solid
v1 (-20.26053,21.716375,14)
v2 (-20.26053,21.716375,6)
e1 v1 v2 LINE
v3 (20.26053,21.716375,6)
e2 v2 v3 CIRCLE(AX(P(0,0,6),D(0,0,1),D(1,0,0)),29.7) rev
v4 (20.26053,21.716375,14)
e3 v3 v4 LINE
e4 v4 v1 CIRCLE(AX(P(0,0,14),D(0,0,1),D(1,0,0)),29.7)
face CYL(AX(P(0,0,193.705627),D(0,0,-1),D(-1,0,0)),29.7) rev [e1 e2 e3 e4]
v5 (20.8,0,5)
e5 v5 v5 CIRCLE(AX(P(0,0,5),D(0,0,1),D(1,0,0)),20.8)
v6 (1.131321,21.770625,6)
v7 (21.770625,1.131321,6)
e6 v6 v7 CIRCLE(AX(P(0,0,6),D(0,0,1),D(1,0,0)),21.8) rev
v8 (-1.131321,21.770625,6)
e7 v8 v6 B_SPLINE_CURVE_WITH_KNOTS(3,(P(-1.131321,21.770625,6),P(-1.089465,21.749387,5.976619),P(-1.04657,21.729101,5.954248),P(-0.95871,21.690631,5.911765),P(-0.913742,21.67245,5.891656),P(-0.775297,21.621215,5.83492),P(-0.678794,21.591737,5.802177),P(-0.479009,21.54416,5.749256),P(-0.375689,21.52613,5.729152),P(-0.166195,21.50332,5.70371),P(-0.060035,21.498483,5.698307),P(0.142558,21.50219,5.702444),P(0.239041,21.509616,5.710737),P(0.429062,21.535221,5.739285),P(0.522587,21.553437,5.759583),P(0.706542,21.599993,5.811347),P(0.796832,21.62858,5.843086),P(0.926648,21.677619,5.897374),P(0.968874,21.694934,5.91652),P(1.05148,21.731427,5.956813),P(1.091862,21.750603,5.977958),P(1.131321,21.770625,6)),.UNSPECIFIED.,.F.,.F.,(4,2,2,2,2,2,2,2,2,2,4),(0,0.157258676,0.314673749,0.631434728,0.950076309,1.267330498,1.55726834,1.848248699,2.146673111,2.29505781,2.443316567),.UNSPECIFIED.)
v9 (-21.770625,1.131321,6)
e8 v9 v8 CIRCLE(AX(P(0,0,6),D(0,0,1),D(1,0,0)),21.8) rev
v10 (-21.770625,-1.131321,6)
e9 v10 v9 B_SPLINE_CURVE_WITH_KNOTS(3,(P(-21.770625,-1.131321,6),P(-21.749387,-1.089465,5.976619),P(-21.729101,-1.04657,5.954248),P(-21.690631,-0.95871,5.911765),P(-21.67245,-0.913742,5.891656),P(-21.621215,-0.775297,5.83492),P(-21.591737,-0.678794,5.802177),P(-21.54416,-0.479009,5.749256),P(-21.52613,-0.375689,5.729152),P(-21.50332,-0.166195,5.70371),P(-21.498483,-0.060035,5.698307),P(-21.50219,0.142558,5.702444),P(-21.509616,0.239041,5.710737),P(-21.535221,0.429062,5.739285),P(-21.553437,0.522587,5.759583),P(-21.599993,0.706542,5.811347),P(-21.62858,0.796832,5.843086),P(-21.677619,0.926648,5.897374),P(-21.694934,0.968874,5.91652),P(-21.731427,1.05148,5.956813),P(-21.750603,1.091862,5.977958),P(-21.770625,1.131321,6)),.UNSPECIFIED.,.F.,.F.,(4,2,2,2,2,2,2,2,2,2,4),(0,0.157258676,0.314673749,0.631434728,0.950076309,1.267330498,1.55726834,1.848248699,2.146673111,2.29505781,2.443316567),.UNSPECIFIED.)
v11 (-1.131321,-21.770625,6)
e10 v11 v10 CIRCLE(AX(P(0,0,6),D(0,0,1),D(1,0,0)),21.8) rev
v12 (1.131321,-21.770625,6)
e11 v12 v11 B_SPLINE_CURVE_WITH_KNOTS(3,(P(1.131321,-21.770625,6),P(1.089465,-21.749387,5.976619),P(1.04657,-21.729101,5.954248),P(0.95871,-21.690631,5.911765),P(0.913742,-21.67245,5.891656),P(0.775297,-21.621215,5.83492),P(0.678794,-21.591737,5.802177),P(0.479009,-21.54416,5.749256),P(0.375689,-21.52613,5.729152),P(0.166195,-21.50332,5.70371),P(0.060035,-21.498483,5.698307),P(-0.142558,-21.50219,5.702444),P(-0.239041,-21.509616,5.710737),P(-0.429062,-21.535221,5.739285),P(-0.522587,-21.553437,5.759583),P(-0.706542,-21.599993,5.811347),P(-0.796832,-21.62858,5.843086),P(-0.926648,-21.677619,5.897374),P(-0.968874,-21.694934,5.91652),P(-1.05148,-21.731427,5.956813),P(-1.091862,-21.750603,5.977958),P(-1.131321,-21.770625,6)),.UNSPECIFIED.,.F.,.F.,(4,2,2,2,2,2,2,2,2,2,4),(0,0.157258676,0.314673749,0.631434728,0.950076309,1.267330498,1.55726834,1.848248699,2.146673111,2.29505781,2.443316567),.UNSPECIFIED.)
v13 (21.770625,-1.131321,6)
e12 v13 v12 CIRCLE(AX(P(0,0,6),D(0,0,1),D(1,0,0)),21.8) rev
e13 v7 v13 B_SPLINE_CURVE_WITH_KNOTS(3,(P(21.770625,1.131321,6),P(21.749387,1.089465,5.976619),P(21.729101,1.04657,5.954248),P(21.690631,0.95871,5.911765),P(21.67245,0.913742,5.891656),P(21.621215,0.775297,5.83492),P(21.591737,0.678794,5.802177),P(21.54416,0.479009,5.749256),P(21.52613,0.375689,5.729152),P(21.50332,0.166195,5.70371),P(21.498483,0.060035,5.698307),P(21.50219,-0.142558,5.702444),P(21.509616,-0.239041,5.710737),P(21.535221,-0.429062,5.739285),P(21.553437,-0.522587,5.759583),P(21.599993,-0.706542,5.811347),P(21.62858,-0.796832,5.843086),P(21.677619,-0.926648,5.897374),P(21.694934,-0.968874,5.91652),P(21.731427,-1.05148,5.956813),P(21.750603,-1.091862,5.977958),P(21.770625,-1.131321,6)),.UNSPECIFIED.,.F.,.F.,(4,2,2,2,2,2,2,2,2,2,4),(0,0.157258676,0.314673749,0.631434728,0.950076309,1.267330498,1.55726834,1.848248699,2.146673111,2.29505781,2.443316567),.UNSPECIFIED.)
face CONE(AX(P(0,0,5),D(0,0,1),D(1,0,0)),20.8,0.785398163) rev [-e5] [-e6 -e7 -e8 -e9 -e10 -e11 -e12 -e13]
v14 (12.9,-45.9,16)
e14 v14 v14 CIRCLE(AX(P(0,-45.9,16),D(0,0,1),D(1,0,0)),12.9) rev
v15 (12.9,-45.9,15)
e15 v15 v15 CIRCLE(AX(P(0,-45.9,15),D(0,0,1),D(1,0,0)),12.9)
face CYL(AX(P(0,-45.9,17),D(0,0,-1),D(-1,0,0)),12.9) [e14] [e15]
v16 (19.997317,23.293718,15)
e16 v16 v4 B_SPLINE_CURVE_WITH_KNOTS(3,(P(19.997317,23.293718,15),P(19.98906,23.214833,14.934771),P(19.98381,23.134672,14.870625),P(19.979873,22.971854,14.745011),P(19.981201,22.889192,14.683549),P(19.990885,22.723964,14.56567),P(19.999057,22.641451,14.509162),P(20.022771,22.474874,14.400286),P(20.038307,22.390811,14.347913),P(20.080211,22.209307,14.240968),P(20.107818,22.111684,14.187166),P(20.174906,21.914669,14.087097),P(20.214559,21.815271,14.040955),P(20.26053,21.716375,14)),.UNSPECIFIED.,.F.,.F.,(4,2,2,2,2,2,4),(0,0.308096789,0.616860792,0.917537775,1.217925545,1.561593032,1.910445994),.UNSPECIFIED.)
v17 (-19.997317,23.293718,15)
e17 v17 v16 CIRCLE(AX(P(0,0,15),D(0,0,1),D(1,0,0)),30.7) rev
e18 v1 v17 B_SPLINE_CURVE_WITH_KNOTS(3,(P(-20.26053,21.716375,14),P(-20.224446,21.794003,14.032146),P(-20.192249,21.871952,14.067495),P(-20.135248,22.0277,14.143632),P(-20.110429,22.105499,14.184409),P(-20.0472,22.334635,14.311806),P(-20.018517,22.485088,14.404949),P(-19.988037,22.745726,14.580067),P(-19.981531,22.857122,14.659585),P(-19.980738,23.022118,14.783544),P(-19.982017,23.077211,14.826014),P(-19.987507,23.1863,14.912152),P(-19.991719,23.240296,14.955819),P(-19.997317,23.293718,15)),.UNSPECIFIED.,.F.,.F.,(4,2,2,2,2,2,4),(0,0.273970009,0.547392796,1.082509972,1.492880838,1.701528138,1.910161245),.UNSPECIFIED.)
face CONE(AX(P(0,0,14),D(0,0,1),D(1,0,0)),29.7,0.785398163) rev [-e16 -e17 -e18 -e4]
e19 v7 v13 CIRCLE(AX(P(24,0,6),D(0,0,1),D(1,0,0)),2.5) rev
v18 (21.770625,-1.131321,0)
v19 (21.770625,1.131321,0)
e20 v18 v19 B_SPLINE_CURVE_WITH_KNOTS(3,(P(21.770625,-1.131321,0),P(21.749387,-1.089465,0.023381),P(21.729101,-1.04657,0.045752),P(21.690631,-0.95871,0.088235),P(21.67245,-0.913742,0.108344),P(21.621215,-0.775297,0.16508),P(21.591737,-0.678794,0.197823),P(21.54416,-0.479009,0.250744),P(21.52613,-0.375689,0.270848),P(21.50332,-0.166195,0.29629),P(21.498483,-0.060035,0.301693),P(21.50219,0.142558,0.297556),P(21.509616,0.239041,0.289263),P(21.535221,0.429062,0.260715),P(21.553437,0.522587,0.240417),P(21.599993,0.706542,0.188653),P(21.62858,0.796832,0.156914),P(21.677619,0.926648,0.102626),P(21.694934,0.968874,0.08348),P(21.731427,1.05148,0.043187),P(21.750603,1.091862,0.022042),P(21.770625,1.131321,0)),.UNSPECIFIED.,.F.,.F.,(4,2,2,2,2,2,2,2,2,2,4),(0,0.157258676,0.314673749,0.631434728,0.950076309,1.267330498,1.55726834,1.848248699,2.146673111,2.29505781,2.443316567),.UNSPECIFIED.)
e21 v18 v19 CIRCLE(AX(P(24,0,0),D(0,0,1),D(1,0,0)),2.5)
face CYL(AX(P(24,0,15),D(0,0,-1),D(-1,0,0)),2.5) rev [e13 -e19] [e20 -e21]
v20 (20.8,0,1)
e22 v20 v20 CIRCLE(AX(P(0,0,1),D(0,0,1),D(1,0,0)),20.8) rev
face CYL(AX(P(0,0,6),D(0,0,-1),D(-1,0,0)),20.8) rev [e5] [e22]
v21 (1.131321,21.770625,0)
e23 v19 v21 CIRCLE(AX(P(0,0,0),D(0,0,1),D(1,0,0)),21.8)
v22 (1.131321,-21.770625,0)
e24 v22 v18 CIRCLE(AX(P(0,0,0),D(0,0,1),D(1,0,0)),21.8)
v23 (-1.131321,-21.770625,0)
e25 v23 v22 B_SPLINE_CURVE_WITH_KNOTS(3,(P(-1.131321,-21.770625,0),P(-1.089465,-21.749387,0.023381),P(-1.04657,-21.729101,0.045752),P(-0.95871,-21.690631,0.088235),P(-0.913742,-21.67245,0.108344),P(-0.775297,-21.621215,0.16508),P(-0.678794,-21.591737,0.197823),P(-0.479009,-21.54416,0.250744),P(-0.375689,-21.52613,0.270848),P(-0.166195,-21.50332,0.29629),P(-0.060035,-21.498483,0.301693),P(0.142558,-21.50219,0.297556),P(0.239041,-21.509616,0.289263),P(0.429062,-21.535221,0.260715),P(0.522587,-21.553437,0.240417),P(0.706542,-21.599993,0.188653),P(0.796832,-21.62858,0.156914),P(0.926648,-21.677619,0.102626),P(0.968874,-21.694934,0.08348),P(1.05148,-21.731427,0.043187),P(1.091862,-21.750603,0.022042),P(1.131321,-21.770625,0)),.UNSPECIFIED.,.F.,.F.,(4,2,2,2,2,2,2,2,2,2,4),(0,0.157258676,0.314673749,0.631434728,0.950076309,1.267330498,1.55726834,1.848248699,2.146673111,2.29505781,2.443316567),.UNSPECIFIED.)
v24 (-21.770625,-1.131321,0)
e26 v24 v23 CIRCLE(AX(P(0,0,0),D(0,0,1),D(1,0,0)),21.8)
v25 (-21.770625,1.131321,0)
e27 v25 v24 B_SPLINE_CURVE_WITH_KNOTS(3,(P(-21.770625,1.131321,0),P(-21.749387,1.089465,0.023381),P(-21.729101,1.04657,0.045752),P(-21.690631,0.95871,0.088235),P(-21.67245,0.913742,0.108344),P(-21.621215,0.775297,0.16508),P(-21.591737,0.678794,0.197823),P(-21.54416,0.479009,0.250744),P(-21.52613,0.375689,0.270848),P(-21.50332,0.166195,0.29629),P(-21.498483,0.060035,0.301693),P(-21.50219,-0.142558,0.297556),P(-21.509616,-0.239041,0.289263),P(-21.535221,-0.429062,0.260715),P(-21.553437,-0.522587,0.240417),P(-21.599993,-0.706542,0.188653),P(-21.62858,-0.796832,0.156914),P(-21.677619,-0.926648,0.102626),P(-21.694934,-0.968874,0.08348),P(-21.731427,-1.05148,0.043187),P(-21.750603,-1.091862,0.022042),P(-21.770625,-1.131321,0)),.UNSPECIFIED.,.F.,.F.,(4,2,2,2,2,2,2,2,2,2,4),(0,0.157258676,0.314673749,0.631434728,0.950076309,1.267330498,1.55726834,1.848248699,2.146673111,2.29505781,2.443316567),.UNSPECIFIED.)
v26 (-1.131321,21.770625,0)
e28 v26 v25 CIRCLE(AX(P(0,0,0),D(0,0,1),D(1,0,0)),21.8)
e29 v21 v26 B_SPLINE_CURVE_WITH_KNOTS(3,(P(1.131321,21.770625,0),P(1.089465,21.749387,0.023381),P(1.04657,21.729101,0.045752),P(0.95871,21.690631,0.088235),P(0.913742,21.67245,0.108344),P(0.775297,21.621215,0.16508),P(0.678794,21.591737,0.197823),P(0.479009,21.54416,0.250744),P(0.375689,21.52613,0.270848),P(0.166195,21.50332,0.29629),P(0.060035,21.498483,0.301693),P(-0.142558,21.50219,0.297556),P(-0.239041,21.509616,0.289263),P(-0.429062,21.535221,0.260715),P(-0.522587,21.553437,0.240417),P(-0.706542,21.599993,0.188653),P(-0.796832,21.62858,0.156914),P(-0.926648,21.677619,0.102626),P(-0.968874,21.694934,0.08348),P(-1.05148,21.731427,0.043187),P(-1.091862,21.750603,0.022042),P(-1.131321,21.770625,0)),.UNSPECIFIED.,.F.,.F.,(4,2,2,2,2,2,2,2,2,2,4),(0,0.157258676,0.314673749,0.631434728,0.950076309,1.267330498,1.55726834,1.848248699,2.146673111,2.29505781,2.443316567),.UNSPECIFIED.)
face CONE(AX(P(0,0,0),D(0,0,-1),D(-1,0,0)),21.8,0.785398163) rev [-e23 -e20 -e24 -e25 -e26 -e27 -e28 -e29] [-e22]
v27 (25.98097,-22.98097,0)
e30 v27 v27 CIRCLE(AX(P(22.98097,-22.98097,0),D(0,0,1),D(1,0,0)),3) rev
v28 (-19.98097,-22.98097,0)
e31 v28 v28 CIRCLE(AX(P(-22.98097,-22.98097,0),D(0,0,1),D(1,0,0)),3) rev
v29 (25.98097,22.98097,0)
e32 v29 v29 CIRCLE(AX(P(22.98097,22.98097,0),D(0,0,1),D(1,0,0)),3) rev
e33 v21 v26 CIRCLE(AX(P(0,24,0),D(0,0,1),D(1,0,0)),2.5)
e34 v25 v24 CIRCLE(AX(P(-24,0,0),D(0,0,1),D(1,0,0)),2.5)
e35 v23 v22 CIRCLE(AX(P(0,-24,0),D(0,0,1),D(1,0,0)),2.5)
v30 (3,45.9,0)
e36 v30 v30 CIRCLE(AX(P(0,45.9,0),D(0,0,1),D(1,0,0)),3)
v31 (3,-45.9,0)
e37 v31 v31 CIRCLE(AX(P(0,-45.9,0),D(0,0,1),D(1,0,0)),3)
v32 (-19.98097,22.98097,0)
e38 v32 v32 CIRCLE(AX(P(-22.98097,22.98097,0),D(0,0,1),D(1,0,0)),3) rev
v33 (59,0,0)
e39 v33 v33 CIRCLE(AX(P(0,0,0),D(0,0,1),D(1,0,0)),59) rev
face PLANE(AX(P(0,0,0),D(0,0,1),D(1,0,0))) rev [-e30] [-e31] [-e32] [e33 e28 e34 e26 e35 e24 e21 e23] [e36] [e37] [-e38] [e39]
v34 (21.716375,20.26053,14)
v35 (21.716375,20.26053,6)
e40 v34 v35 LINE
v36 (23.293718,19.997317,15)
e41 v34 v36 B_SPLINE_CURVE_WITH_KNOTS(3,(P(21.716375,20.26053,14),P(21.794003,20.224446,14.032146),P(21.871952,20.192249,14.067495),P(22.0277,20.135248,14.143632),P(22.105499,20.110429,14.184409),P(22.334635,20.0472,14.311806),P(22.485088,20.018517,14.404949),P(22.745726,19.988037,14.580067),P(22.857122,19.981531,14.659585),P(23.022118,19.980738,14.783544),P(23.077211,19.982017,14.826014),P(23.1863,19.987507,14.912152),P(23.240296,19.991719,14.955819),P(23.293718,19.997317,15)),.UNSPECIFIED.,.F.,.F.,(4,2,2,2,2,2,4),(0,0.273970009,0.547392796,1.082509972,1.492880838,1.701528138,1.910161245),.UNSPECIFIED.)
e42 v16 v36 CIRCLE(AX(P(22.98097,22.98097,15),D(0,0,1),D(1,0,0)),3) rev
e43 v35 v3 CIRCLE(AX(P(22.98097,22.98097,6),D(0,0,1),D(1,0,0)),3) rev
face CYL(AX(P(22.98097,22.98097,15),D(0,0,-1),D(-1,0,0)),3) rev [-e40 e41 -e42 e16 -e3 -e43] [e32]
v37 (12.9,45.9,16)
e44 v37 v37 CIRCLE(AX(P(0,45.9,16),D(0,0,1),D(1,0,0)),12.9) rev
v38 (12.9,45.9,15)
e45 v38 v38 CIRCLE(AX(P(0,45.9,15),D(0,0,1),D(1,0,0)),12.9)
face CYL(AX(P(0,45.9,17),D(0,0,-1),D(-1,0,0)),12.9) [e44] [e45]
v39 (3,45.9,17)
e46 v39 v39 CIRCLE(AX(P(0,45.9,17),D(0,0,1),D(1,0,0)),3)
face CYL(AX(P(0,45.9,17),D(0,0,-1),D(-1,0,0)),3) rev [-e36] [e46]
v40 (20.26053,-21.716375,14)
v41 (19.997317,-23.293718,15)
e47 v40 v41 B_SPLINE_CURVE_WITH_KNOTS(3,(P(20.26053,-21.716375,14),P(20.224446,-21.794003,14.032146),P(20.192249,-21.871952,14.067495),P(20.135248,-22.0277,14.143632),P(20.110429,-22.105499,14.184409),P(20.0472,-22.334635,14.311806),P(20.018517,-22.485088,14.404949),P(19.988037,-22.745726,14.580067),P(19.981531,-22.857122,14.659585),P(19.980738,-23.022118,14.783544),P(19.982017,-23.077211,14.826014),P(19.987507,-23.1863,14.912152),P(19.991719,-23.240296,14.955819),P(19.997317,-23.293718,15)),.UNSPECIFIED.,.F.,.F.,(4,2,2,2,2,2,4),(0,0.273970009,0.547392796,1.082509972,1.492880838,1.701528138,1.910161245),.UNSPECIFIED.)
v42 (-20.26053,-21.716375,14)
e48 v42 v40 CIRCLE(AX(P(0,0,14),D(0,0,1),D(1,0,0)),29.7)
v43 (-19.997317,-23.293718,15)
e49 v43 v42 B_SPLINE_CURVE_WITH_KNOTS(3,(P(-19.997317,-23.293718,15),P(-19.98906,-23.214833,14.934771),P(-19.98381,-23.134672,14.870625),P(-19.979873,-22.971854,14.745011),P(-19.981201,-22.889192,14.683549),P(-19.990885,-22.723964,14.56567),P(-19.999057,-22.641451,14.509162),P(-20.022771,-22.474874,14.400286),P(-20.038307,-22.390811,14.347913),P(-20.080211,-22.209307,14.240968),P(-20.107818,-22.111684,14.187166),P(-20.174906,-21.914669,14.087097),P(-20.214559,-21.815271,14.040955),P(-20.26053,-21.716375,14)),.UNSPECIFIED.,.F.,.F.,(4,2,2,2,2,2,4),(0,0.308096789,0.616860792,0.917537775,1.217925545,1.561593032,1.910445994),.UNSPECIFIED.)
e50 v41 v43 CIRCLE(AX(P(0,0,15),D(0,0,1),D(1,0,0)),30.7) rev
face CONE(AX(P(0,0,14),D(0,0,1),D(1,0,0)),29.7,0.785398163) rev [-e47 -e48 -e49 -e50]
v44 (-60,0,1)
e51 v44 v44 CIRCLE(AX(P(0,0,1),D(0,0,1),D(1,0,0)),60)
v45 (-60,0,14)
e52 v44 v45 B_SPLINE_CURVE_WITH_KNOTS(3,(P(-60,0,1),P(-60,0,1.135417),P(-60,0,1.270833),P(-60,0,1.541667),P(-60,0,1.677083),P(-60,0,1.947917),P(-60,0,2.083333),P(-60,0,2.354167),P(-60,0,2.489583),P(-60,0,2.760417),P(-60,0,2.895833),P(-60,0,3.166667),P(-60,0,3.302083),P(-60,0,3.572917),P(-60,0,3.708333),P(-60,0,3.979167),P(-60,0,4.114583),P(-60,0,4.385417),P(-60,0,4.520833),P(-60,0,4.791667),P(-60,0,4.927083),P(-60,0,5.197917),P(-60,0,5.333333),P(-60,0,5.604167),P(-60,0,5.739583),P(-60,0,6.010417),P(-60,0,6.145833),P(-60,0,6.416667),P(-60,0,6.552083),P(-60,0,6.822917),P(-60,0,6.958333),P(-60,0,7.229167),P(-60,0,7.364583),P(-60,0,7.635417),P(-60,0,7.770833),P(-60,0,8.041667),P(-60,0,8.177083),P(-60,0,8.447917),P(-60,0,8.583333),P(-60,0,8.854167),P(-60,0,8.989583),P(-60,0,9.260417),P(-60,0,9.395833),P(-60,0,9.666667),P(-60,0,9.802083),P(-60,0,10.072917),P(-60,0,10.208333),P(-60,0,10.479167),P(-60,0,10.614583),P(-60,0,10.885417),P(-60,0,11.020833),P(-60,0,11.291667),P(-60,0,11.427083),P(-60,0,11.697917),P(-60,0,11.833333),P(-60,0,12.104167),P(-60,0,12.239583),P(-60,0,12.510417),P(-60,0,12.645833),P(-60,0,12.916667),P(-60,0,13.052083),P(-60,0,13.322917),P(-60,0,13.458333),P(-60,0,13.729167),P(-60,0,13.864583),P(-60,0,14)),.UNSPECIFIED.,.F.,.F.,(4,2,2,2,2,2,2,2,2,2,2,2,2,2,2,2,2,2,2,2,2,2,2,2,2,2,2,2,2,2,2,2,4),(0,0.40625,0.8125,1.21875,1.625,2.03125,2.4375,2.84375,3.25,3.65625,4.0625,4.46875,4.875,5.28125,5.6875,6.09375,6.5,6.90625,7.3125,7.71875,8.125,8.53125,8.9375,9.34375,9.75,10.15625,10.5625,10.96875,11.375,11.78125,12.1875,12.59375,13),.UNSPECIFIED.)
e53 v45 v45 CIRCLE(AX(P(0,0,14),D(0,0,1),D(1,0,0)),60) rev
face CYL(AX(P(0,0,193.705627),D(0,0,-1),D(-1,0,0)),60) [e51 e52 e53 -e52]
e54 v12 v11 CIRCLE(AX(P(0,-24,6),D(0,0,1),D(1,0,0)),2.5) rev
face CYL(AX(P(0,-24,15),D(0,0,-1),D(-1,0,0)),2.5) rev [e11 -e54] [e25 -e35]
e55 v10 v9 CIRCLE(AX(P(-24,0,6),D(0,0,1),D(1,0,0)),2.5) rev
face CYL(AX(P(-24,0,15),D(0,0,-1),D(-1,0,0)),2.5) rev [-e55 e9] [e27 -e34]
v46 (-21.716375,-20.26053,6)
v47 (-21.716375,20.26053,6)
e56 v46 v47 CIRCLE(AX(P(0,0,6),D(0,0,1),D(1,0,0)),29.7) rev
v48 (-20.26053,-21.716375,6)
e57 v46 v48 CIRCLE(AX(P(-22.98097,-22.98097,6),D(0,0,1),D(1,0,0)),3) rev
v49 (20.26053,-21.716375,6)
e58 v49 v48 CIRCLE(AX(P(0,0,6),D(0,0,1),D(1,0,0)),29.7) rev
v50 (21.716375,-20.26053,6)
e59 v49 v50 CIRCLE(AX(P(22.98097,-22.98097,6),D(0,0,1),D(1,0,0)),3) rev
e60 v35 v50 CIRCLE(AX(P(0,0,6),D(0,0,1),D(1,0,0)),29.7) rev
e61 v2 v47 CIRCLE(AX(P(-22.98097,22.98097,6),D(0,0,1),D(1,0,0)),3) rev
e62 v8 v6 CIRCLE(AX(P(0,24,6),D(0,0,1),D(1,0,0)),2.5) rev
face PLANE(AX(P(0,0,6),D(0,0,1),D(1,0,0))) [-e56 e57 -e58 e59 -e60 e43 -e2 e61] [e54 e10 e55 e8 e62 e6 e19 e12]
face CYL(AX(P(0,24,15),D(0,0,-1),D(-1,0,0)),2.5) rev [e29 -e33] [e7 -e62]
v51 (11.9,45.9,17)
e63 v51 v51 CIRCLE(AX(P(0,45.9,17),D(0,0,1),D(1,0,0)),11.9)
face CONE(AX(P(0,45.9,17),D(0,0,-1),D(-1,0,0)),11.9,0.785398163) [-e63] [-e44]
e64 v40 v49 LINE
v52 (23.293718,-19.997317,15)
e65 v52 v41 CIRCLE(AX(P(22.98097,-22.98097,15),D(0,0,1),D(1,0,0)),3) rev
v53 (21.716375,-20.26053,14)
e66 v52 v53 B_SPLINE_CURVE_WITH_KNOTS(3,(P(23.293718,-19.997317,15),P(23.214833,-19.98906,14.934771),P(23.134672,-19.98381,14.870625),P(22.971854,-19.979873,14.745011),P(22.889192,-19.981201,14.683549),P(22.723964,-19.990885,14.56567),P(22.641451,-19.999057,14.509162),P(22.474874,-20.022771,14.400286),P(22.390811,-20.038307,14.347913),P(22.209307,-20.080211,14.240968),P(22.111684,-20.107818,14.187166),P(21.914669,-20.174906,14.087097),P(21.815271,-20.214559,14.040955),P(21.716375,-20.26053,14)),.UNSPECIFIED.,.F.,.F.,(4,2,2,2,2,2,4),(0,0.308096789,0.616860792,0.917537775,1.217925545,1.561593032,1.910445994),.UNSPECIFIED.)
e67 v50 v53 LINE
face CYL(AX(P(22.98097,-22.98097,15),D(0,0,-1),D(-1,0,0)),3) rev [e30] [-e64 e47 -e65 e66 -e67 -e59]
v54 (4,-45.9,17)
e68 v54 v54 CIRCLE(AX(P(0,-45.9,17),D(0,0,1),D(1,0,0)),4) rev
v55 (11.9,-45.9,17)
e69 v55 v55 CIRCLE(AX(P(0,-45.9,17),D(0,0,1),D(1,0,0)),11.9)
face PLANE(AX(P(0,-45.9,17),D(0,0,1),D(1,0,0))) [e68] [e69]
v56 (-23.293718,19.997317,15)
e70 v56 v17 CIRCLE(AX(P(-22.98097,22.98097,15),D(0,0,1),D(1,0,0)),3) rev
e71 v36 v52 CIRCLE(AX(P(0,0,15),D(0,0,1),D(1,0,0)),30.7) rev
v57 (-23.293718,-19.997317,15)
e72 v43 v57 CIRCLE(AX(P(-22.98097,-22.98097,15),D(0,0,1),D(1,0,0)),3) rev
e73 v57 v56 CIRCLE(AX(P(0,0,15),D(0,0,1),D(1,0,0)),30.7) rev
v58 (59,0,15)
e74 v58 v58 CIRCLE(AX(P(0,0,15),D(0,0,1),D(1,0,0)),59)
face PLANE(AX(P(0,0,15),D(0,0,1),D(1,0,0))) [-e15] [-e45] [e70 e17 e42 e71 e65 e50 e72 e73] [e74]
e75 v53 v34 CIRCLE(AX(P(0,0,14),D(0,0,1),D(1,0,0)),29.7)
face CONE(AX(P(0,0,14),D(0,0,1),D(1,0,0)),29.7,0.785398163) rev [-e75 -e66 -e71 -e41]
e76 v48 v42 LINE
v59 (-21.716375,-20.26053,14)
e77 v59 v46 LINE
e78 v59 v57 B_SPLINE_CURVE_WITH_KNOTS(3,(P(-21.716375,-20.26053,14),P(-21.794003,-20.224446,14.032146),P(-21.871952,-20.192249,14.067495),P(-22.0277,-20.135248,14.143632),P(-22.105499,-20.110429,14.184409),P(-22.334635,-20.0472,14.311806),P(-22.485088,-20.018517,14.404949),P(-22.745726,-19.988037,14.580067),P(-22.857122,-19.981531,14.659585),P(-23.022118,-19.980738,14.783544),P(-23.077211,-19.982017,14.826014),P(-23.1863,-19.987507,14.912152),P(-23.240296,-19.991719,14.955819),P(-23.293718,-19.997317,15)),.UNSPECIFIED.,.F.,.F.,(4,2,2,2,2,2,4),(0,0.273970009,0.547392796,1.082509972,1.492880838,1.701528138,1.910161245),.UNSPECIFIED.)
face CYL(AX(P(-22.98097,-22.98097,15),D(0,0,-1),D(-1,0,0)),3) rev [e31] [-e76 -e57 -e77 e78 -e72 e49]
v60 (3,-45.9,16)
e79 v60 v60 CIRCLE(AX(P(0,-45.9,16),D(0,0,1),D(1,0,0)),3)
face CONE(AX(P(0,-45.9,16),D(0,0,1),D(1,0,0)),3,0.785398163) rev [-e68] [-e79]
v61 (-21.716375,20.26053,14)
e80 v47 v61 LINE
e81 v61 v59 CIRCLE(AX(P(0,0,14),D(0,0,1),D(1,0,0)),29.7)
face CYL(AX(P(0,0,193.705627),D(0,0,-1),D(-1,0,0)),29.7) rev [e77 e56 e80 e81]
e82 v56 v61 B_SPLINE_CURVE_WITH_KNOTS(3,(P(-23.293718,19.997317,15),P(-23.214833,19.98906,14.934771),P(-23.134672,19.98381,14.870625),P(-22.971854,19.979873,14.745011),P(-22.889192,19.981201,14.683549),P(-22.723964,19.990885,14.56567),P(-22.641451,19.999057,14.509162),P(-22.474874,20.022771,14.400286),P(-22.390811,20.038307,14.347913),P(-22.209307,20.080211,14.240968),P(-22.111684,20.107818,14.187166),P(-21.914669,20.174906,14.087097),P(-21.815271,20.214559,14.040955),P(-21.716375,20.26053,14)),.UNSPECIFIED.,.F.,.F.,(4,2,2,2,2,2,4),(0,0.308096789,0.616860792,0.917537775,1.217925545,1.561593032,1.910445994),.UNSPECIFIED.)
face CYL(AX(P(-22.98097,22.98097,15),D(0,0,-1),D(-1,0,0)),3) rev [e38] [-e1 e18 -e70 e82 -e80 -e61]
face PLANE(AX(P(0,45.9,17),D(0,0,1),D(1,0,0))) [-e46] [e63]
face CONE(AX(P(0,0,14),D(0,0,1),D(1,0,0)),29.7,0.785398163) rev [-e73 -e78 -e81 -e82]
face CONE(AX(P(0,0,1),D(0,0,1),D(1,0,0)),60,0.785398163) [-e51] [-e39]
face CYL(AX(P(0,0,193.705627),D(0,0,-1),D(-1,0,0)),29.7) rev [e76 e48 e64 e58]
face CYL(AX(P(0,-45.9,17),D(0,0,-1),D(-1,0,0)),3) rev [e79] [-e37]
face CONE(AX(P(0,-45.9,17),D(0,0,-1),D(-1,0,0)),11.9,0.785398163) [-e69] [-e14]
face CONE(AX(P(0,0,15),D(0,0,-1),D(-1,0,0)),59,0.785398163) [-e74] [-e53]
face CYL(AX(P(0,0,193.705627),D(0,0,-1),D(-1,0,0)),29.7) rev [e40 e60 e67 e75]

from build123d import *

# Parameters (mm, degrees)
SKETCH1_R               = 29.7
SKETCH1_R_2             = 20.8
BOSS_EXTRUDE1_DEPTH     = 6
SKETCH3_R               = 60
SKETCH3_R_2             = 29.7
BOSS_EXTRUDE2_DEPTH     = 15
CUT_EXTRUDE1_DEPTH      = 87.168439698
CUT_EXTRUDE1_DEPTH_BACK = 87.168439698
SKETCH4_R               = 3
CUT_EXTRUDE3_DEPTH      = 87.168439698
CUT_EXTRUDE3_DEPTH_BACK = 87.168439698
SKETCH2_R               = 2.5
SKETCH5_R               = 12.9
SKETCH5_R_2             = 3
BOSS_EXTRUDE3_DEPTH     = 2
CUT_EXTRUDE4_DEPTH      = 87.168439698
CUT_EXTRUDE4_DEPTH_BACK = 87.168439698
SKETCH5_2_R             = 3
CHAMFER1_SIZE           = 1


with BuildPart() as part:
    # Sketch1 → Boss-Extrude1 (new body)
    with BuildSketch(Plane.XY):
        Circle(SKETCH1_R)
        Circle(SKETCH1_R_2, mode=Mode.SUBTRACT)
    extrude(amount=BOSS_EXTRUDE1_DEPTH)

    # Sketch3 → Boss-Extrude2 (add)
    with BuildSketch(Plane.XY):
        with Locations(Location((0, 0, 0), (0, 0, 180))):
            Circle(SKETCH3_R)
        with Locations(Location((0, 0, 0), (0, 0, 180))):
            Circle(SKETCH3_R_2, mode=Mode.SUBTRACT)
    extrude(amount=BOSS_EXTRUDE2_DEPTH)

    # Sketch4 → Cut-Extrude1 (cut, two sides: drawn at the far end of the back side and taken through both)
    with BuildSketch(Plane.XY.offset(-CUT_EXTRUDE1_DEPTH_BACK)):
        with Locations(Location((-22.980970389, 22.980970389, 0), (0, 0, 294.931333751))):
            Circle(SKETCH4_R)
        with Locations(Location((22.980970389, 22.980970389, 0), (0, 0, 204.931333751))):
            Circle(SKETCH4_R)
        with Locations(Location((22.980970389, -22.980970389, 0), (0, 0, 155.068666249))):
            Circle(SKETCH4_R)
        with Locations(Location((-22.980970389, -22.980970389, 0), (0, 0, 65.068666249))):
            Circle(SKETCH4_R)
    extrude(amount=CUT_EXTRUDE1_DEPTH + CUT_EXTRUDE1_DEPTH_BACK, mode=Mode.SUBTRACT)

    # Sketch2 → Cut-Extrude3 (cut, two sides: drawn at the far end of the back side and taken through both)
    with BuildSketch(Plane.XY.offset(-CUT_EXTRUDE3_DEPTH_BACK)):
        with Locations((0, 24)):
            Circle(SKETCH2_R)
        with Locations((24, 0)):
            Circle(SKETCH2_R)
        with Locations((0, -24)):
            Circle(SKETCH2_R)
        with Locations((-24, 0)):
            Circle(SKETCH2_R)
    extrude(amount=CUT_EXTRUDE3_DEPTH + CUT_EXTRUDE3_DEPTH_BACK, mode=Mode.SUBTRACT)

    # Sketch5 → Boss-Extrude3 (add)
    # profile 1 of 2: a face of its own
    with BuildSketch(Plane.XY.offset(15)):
        with Locations((0, 45.9)):
            Circle(SKETCH5_R)
        with Locations((0, 45.9)):
            Circle(SKETCH5_R_2, mode=Mode.SUBTRACT)
    # profile 2 of 2: a face of its own
    with BuildSketch(Plane.XY.offset(15)):
        with Locations((0, -45.9)):
            Circle(SKETCH5_R)
        with Locations((0, -45.9)):
            Circle(SKETCH5_R_2, mode=Mode.SUBTRACT)
    extrude(amount=BOSS_EXTRUDE3_DEPTH)

    # Sketch5<2> → Cut-Extrude4 (cut, two sides: drawn at the far end of the back side and taken through both)
    with BuildSketch(Plane.XY.offset(15).offset(-CUT_EXTRUDE4_DEPTH_BACK)):
        with Locations((0, 45.9)):
            Circle(SKETCH5_2_R)
        with Locations((0, -45.9)):
            Circle(SKETCH5_2_R)
    extrude(amount=CUT_EXTRUDE4_DEPTH + CUT_EXTRUDE4_DEPTH_BACK, mode=Mode.SUBTRACT)

    # Chamfer1
    # the kernel refuses this chamfer: 1 mm, written as the material it takes off along each edge
    with BuildSketch(Plane(origin=(0, 0, 0), x_dir=(-1, 0, 0), z_dir=(0, 1, 0))) as chamfer1_piece_1:
        Polygon((60 - CHAMFER1_SIZE, 0), (60, CHAMFER1_SIZE), (60, 0), align=None)
    revolve(axis=Axis((0, 0, 0), (0, 0, 1)), mode=Mode.SUBTRACT)
    with BuildSketch(Plane(origin=(0, 0, 15), x_dir=(-1, 0, 0), z_dir=(0, 1, 0))) as chamfer1_piece_2:
        Polygon((60, -CHAMFER1_SIZE), (60 - CHAMFER1_SIZE, 0), (60, 0), align=None)
    revolve(axis=Axis((0, 0, 15), (0, 0, 1)), mode=Mode.SUBTRACT)
    with BuildSketch(Plane(origin=(0, 0, 15), x_dir=(0.742872020210988, 0.6694334631519742, 0), z_dir=(0.6694334631519742, -0.742872020210988, 0))) as chamfer1_piece_3:
        Polygon((29.7, -CHAMFER1_SIZE), (29.7 + CHAMFER1_SIZE, 0), (29.7, 0), align=None)
    revolve(axis=Axis((0, 0, 15), (0, 0, 1)), revolution_arc=95.953291469, mode=Mode.SUBTRACT)
    with BuildSketch(Plane(origin=(0, 0, 15), x_dir=(-0.6694334631519382, 0.7428720202110204, 0), z_dir=(0.7428720202110204, 0.6694334631519382, 0))) as chamfer1_piece_4:
        Polygon((29.7, -CHAMFER1_SIZE), (29.7 + CHAMFER1_SIZE, 0), (29.7, 0), align=None)
    revolve(axis=Axis((0, 0, 15), (0, 0, 1)), revolution_arc=95.953291469, mode=Mode.SUBTRACT)
    with BuildSketch(Plane(origin=(0, 0, 15), x_dir=(-0.7428720202113098, -0.6694334631516169, 0), z_dir=(-0.6694334631516169, 0.7428720202113098, 0))) as chamfer1_piece_5:
        Polygon((29.7, -CHAMFER1_SIZE), (29.7 + CHAMFER1_SIZE, 0), (29.7, 0), align=None)
    revolve(axis=Axis((0, 0, 15), (0, 0, 1)), revolution_arc=95.953291469, mode=Mode.SUBTRACT)
    with BuildSketch(Plane(origin=(0, 0, 15), x_dir=(0.6694334631516162, -0.7428720202113106, 0), z_dir=(-0.7428720202113106, -0.6694334631516162, 0))) as chamfer1_piece_6:
        Polygon((29.7, -CHAMFER1_SIZE), (29.7 + CHAMFER1_SIZE, 0), (29.7, 0), align=None)
    revolve(axis=Axis((0, 0, 15), (0, 0, 1)), revolution_arc=95.95329147, mode=Mode.SUBTRACT)
    with BuildSketch(Plane(origin=(0, 0, 0), x_dir=(1, 0, 0), z_dir=(0, -1, 0))) as chamfer1_piece_7:
        Polygon((20.8, CHAMFER1_SIZE), (20.8 + CHAMFER1_SIZE, 0), (20.8, 0), align=None)
    revolve(axis=Axis((0, 0, 0), (0, 0, 1)), mode=Mode.SUBTRACT)
    with BuildSketch(Plane(origin=(0, 0, 6), x_dir=(1, 0, 0), z_dir=(0, -1, 0))) as chamfer1_piece_8:
        Polygon((20.8, -CHAMFER1_SIZE), (20.8 + CHAMFER1_SIZE, 0), (20.8, 0), align=None)
    revolve(axis=Axis((0, 0, 6), (0, 0, 1)), mode=Mode.SUBTRACT)
    with BuildSketch(Plane(origin=(0, 45.9, 17), x_dir=(1, 0, 0), z_dir=(0, -1, 0))) as chamfer1_piece_9:
        Polygon((12.9, -CHAMFER1_SIZE), (12.9 - CHAMFER1_SIZE, 0), (12.9, 0), align=None)
    revolve(axis=Axis((0, 45.9, 17), (0, 0, 1)), mode=Mode.SUBTRACT)
    with BuildSketch(Plane(origin=(0, -45.9, 17), x_dir=(1, 0, 0), z_dir=(0, -1, 0))) as chamfer1_piece_10:
        Polygon((12.9, -CHAMFER1_SIZE), (12.9 - CHAMFER1_SIZE, 0), (12.9, 0), align=None)
    revolve(axis=Axis((0, -45.9, 17), (0, 0, 1)), mode=Mode.SUBTRACT)
    with BuildSketch(Plane(origin=(0, -45.9, 17), x_dir=(1, 0, 0), z_dir=(0, -1, 0))) as chamfer1_piece_11:
        Polygon((3, -CHAMFER1_SIZE), (3 + CHAMFER1_SIZE, 0), (3, 0), align=None)
    revolve(axis=Axis((0, -45.9, 17), (0, 0, 1)), mode=Mode.SUBTRACT)


solid = part.part
